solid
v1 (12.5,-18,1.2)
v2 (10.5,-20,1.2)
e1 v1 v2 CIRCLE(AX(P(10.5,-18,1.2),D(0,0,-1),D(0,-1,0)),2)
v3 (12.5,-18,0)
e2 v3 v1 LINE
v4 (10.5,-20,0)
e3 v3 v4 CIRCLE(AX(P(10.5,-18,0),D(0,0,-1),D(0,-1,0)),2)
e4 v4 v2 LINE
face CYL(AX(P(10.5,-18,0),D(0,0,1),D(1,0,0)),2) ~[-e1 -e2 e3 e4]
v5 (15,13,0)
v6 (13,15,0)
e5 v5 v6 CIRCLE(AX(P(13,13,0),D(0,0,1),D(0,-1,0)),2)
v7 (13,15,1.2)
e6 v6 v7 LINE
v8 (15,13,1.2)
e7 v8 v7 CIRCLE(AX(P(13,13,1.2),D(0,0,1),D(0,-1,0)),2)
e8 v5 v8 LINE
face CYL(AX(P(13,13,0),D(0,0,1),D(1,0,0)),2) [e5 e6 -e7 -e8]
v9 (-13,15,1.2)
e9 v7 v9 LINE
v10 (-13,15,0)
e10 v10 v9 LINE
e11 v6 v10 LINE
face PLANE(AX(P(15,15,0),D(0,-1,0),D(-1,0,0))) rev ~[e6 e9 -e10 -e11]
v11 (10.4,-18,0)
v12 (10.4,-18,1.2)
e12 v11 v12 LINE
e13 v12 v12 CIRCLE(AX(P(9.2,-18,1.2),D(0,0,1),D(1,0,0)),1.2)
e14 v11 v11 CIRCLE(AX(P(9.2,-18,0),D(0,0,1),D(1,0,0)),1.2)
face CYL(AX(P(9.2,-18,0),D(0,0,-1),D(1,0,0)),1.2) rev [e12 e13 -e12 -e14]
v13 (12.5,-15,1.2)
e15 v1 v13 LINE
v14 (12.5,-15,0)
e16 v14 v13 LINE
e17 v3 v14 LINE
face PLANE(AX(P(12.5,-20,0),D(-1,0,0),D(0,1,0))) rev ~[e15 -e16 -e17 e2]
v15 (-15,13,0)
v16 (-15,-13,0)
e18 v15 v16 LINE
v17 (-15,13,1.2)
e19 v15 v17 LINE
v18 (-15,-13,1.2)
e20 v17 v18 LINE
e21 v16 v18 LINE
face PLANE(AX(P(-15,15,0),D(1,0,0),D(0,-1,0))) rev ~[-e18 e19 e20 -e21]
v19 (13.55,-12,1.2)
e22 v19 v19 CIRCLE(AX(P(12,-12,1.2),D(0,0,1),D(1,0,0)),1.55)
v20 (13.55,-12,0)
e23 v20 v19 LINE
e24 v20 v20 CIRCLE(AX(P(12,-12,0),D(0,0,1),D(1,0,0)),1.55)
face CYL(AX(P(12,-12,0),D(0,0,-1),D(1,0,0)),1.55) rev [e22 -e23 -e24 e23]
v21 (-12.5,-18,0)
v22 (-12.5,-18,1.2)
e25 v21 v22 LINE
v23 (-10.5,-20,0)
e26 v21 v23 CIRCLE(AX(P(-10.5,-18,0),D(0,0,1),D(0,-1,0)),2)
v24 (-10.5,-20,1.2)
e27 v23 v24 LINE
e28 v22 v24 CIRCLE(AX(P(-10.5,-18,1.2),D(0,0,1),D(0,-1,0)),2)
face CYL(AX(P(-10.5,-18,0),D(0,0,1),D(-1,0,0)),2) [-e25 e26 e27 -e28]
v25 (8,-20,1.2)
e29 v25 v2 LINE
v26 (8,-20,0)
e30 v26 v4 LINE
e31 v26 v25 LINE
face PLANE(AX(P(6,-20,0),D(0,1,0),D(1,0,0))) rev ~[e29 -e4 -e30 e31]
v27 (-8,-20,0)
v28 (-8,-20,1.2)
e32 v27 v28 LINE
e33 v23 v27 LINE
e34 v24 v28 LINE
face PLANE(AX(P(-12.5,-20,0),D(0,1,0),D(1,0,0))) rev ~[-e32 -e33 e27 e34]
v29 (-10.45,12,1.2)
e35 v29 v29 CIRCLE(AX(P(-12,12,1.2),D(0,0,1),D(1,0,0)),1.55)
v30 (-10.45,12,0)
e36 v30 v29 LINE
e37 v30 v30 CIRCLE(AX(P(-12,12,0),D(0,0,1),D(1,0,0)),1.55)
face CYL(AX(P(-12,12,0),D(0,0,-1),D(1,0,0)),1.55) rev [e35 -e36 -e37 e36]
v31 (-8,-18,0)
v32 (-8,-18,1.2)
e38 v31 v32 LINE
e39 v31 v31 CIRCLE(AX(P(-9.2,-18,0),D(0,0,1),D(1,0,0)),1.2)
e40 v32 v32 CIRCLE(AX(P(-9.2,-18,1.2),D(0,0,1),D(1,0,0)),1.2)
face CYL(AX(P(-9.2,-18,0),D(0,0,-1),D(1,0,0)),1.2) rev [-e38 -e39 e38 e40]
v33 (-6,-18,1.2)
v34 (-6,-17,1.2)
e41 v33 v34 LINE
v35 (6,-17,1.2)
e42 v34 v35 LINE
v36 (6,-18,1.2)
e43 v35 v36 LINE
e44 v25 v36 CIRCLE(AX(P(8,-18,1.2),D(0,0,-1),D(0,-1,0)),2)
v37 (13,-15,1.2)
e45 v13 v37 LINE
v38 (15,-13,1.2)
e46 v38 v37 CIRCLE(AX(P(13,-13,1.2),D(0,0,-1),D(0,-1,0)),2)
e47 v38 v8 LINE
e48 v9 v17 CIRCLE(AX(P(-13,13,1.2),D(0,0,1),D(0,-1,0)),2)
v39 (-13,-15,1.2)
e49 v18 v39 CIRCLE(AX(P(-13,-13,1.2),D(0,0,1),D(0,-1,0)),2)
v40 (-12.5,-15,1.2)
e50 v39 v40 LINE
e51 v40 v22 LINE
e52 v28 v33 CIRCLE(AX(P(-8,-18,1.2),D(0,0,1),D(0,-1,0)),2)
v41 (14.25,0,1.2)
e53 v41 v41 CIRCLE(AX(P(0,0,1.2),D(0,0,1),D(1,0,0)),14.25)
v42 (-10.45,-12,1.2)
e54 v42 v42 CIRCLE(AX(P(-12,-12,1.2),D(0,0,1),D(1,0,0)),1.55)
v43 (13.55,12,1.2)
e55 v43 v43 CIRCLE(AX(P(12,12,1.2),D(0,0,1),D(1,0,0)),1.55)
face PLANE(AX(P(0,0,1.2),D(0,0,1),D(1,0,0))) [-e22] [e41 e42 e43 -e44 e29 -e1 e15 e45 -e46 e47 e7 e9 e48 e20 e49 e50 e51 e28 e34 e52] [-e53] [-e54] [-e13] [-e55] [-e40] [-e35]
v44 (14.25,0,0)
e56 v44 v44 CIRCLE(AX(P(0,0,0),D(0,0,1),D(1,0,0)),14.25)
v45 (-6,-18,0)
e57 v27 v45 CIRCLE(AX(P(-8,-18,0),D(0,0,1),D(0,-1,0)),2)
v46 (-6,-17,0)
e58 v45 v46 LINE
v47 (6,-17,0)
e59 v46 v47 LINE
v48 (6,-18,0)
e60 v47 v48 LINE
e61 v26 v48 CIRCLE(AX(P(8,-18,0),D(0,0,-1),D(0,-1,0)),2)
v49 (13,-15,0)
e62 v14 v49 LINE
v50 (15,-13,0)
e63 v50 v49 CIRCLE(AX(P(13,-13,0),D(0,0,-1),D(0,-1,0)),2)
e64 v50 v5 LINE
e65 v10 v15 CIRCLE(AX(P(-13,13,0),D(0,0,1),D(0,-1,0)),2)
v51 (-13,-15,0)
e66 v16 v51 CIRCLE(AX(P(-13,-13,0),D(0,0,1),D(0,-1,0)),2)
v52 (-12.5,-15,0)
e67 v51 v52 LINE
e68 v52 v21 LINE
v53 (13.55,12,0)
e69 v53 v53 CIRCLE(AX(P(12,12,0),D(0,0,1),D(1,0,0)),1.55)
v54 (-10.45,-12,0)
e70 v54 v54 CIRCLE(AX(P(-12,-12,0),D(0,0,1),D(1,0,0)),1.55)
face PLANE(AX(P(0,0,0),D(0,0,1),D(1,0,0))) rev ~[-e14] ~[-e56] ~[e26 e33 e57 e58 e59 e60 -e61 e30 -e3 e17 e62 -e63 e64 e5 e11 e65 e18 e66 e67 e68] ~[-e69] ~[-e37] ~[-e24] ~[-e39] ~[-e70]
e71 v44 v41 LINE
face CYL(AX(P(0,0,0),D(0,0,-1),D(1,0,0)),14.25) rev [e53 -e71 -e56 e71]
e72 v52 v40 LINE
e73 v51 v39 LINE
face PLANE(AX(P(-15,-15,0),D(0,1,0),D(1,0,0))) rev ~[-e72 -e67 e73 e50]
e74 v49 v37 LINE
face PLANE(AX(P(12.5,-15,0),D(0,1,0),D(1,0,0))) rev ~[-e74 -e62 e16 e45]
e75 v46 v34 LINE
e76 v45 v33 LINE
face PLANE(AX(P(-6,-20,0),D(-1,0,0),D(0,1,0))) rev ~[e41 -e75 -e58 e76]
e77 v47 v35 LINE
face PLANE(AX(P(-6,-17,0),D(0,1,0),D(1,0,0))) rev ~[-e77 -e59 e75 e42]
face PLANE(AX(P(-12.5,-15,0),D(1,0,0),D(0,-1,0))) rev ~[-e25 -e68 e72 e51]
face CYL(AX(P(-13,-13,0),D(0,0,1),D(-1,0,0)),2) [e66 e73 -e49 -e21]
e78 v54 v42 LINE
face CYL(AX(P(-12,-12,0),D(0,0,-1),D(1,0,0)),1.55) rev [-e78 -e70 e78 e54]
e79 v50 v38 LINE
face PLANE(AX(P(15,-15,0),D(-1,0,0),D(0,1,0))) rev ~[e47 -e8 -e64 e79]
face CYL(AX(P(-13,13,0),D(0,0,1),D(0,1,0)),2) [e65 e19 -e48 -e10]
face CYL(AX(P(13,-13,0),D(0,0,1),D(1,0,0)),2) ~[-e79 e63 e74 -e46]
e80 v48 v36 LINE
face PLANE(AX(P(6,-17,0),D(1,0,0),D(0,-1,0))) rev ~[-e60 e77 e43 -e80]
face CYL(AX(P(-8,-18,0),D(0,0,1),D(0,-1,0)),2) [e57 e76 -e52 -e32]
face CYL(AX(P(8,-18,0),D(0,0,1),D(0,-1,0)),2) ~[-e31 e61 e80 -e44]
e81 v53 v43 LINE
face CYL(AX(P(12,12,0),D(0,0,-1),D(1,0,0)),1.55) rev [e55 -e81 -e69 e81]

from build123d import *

# Parameters (mm, degrees)
F0_R     = 1.55
F0_R_2   = 14.25
F0_R_3   = 1.2
F0_W     = 12
F0_H     = 2
F1_DEPTH = 1.2
F2_R     = 2


with BuildPart() as f1:
    # F0 (on Top) → F1 (new body)
    with BuildSketch(Plane.XY):
        Polygon((12.5, -15), (15, -15), (15, 15), (-15, 15), (-15, -15), (-12.5, -15), (-6, -15), (6, -15), align=None)
        with Locations((-12, -12)):
            Circle(F0_R, mode=Mode.SUBTRACT)
        with Locations((12, -12)):
            Circle(F0_R, mode=Mode.SUBTRACT)
        with Locations((-12, 12)):
            Circle(F0_R, mode=Mode.SUBTRACT)
        Circle(F0_R_2, mode=Mode.SUBTRACT)
        with Locations((12, 12)):
            Circle(F0_R, mode=Mode.SUBTRACT)
        Polygon((-6, -17), (-6, -15), (-12.5, -15), (-12.5, -20), (-6, -20), align=None)
        with Locations((-9.2, -18)):
            Circle(F0_R_3, mode=Mode.SUBTRACT)
        with Locations((0, -16)):
            Rectangle(F0_W, F0_H)
        Polygon((12.5, -20), (12.5, -15), (6, -15), (6, -17), (6, -20), align=None)
        with Locations((9.2, -18)):
            Circle(F0_R_3, mode=Mode.SUBTRACT)
    extrude(amount=F1_DEPTH)

    # F2
    f2_edges = [f1.edges().sort_by_distance(p)[0] for p in [
        (15, -15, 0.6),
        (-15, -15, 0.6),
        (-15, 15, 0.6),
        (15, 15, 0.6),
        (-12.5, -20, 0.6),
        (-6, -20, 0.6),
        (6, -20, 0.6),
        (12.5, -20, 0.6),
    ]]
    fillet(f2_edges, radius=F2_R)


solid = f1.part
